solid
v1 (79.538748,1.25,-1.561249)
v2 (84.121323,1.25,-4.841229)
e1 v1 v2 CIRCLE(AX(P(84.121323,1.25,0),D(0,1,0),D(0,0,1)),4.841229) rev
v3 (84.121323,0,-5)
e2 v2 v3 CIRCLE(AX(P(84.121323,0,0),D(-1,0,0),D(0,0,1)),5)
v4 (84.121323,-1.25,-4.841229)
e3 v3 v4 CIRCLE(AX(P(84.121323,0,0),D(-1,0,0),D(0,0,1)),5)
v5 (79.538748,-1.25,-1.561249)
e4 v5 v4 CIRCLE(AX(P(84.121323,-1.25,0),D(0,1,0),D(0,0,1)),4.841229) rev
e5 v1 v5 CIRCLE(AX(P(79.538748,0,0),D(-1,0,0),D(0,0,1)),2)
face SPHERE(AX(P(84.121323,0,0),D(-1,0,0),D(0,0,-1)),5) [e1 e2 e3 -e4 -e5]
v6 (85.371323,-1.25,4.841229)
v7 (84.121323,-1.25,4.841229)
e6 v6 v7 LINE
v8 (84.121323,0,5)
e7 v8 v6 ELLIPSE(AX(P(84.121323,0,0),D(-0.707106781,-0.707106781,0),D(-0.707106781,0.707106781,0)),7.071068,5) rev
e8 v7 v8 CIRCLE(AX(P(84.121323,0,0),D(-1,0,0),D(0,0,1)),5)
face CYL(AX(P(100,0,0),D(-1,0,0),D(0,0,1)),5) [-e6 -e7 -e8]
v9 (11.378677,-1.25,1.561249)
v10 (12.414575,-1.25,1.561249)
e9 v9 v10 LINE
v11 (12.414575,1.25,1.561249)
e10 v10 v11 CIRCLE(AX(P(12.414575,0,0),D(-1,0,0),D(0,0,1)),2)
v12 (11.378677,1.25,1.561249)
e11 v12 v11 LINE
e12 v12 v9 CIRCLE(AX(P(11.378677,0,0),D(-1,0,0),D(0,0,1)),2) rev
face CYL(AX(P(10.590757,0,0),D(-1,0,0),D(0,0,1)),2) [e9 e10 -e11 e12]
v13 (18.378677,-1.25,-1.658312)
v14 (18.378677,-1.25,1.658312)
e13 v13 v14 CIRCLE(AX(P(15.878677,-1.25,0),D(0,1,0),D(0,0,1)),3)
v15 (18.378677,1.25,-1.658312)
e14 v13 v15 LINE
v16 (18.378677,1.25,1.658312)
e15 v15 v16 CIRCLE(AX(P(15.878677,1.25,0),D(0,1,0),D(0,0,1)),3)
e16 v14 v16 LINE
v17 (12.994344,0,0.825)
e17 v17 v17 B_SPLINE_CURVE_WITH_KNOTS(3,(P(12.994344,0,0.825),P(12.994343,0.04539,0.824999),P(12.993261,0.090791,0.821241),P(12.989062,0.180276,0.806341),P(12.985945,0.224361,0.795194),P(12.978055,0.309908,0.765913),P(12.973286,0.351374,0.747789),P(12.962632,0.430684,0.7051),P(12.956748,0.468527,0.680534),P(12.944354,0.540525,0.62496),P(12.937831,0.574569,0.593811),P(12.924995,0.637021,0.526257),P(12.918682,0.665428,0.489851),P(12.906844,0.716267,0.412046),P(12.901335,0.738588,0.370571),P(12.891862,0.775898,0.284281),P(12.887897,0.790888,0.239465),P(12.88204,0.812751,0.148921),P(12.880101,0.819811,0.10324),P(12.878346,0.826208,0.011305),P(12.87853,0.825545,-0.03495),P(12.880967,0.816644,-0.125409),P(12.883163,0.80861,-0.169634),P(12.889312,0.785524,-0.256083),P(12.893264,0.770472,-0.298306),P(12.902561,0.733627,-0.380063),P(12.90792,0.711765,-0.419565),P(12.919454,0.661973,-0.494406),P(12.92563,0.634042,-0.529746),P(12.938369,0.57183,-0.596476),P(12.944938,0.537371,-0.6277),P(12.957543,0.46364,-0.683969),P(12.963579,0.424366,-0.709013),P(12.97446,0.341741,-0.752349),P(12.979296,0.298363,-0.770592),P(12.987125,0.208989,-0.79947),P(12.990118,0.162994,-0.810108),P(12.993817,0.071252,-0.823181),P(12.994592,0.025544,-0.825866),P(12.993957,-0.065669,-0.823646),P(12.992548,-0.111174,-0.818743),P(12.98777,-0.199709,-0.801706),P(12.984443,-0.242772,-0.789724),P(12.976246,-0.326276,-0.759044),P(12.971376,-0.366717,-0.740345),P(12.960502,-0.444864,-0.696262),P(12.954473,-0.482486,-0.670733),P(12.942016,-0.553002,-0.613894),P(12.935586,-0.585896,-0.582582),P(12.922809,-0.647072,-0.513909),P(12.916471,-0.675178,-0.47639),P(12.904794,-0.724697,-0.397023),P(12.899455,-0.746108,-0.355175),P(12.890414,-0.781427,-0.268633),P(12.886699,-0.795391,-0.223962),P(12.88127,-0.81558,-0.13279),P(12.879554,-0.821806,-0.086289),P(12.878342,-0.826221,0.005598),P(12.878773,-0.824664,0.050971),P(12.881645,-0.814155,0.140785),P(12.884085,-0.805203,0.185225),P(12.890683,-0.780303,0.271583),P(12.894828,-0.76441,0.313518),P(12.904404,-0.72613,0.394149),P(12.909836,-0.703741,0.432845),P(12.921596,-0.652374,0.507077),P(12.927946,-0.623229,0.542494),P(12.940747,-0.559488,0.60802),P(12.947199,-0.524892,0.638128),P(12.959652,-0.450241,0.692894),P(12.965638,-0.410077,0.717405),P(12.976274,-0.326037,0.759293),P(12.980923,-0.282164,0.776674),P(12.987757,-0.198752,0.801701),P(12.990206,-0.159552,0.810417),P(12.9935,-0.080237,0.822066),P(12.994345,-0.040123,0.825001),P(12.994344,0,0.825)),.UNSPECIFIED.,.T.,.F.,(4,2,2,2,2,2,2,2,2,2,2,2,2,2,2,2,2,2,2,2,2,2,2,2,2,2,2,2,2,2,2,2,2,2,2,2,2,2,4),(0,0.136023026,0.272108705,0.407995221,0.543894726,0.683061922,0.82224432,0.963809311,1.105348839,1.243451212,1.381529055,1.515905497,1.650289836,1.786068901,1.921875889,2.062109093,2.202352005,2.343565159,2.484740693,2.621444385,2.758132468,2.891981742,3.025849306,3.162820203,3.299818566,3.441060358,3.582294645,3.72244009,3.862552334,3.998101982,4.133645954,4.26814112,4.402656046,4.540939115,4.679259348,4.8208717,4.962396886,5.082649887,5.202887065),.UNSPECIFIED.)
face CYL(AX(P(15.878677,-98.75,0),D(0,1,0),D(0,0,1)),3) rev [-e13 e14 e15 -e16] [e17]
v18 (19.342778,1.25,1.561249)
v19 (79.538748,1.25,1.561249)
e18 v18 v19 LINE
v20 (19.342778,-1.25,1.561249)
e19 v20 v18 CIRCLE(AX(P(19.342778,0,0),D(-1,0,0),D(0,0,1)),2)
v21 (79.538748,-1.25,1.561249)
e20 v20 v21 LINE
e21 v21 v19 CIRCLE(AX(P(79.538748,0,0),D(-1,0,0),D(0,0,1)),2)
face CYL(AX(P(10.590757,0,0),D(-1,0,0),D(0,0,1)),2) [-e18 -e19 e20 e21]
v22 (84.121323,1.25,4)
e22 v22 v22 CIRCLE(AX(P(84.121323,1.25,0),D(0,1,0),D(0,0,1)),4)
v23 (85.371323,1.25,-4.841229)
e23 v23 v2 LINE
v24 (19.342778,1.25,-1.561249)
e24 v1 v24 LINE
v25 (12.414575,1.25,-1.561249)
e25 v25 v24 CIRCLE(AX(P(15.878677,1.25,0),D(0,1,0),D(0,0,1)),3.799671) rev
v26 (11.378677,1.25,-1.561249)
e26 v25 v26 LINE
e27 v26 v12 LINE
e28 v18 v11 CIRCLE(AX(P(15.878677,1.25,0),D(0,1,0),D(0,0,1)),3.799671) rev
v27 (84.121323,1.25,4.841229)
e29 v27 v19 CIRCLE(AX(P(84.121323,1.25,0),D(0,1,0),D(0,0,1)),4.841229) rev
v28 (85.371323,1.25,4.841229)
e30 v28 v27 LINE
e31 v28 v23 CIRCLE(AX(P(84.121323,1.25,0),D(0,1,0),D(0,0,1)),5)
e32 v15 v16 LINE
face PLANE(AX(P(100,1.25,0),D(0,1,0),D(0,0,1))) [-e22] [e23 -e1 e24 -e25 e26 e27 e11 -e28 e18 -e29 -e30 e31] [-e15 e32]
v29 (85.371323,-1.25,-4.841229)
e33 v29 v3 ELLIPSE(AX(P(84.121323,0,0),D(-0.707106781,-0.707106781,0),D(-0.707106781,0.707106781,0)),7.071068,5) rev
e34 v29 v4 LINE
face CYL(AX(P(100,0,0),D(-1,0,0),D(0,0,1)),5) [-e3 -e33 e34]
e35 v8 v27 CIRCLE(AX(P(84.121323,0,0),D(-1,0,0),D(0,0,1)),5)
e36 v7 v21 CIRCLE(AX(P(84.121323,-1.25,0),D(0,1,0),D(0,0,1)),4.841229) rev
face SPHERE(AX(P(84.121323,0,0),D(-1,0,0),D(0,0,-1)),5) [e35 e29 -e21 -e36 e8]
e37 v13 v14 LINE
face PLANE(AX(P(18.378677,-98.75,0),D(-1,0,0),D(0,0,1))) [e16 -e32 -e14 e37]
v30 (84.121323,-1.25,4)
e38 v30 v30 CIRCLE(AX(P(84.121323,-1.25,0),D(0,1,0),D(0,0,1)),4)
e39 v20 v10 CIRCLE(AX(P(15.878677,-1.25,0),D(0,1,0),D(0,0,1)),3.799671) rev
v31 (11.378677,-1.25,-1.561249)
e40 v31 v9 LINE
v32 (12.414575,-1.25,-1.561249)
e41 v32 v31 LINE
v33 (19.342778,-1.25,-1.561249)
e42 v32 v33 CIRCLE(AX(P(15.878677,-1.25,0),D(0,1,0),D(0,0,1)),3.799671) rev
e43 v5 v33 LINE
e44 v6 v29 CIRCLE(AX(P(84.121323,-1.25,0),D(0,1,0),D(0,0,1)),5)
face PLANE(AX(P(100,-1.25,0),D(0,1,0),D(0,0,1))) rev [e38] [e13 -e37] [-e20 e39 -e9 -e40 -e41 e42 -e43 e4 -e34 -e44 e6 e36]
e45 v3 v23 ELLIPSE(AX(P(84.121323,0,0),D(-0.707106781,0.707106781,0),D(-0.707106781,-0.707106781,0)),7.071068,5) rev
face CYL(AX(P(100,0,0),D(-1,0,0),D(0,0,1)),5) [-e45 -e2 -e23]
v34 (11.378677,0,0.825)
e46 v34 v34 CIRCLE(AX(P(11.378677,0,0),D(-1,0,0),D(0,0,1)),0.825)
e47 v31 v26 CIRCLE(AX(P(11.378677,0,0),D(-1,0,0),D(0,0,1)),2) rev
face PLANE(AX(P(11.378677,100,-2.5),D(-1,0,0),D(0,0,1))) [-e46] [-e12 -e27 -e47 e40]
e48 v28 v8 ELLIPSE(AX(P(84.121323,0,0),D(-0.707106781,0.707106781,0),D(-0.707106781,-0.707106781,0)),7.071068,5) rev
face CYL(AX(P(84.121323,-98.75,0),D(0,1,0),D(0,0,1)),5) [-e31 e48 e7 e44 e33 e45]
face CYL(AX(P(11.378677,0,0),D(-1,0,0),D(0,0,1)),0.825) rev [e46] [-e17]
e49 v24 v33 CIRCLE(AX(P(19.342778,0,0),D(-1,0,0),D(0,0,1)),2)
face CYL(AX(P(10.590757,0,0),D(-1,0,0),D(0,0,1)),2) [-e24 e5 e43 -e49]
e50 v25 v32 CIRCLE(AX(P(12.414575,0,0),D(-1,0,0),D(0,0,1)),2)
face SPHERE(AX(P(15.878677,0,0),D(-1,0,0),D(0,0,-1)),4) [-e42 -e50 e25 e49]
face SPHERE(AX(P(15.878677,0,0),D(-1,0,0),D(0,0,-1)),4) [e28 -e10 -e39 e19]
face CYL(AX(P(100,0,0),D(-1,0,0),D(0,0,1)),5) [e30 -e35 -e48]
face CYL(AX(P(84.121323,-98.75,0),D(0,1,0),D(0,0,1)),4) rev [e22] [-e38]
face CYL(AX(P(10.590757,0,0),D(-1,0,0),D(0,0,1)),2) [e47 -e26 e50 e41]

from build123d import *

# Parameters (mm, degrees)
EXTRUDE_1_DEPTH          = 100
CUT_EXTRUDE_START        = -2.5
CUT_EXTRUDE_1_OUTLINE_W  = 107.411770938
CUT_EXTRUDE_1_OUTLINE_H  = 17.637554046
CUT_EXTRUDE_1_OUTLINE_R  = 4
CUT_EXTRUDE_1_DEPTH      = 2.5
CUT_EXTRUDE_2_DEPTH      = 100
CUT_EXTRUDE_2_DEPTH_BACK = 100
SKETCH_6_W               = 1
SKETCH_6_H               = 5
M2X0_35_1_D              = 1.65
M2X0_35_1_DEPTH          = 2
M2X0_35_1_TIP            = 0.495710011


# Read off the part's stored shape, not the designer's step: 切除-拉伸1
with BuildPart() as part:
    # 草图1 → 凸台-拉伸1 (new body)
    with BuildSketch(Plane(origin=(0, 0, 0), x_dir=(0, 0, -1), z_dir=(1, 0, 0))):
        with BuildLine():
            Line((4.841229183, 1.25), (0, 1.25))
            Line((0, 1.25), (0, -1.25))
            Line((0, -1.25), (4.841229183, -1.25))
            ThreePointArc((4.841229183, -1.25), (4.960148481, -0.630021462), (5, 0))
            ThreePointArc((5, 0), (4.960148481, 0.630021462), (4.841229183, 1.25))
        make_face()
        with BuildLine():
            Line((0, -1.25), (0, 1.25))
            Line((0, 1.25), (-4.841229183, 1.25))
            ThreePointArc((-4.841229183, 1.25), (-5, 0), (-4.841229183, -1.25))
            Line((-4.841229183, -1.25), (0, -1.25))
        make_face()
    extrude(amount=EXTRUDE_1_DEPTH)

    # 切除-拉伸1 outline → 切除-拉伸1 (cut)
    # profile 1 of 3: a face of its own
    with BuildSketch(Plane(origin=(0, 1.25, 0), x_dir=(1, 0, 0), z_dir=(0, 1, 0)).offset(CUT_EXTRUDE_START)):
        with Locations((50.551661955, -0.114939413)):
            Rectangle(CUT_EXTRUDE_1_OUTLINE_W, CUT_EXTRUDE_1_OUTLINE_H)
        with BuildLine():
            Line((15.8786768, 5), (84.1213232, 5))
            ThreePointArc((84.1213232, 5), (89.1213232, 0), (84.1213232, -5))
            Line((84.1213232, -5), (15.8786768, -5))
            ThreePointArc((15.8786768, -5), (10.8786768, 0), (15.8786768, 5))
        make_face(mode=Mode.SUBTRACT)
    # profile 2 of 3: a face of its own
    with BuildSketch(Plane(origin=(0, 1.25, 0), x_dir=(1, 0, 0), z_dir=(0, 1, 0)).offset(CUT_EXTRUDE_START)):
        with BuildLine():
            Line((18.3786768, -1.658312395), (18.3786768, 1.658312395))
            ThreePointArc((18.3786768, 1.658312395), (12.8786768, 0), (18.3786768, -1.658312395))
        make_face()
    # profile 3 of 3: a face of its own
    with BuildSketch(Plane(origin=(0, 1.25, 0), x_dir=(1, 0, 0), z_dir=(0, 1, 0)).offset(CUT_EXTRUDE_START)):
        with Locations((84.1213232, 0)):
            Circle(CUT_EXTRUDE_1_OUTLINE_R)
    extrude(amount=CUT_EXTRUDE_1_DEPTH, mode=Mode.SUBTRACT)

    # 草图3 → 切除-旋转2 (revolve, cut)
    with BuildSketch(Plane(origin=(0, 0, 0), x_dir=(1, 0, 0), z_dir=(0, 1, 0))):
        with BuildLine():
            Line((12.414575185, -2), (10.590757267, -2))
            Line((10.590757267, -2), (10.590757267, -5))
            Line((10.590757267, -5), (84.1213232, -5))
            ThreePointArc((84.1213232, -5), (81.382710412, -4.183300133), (79.538747505, -2))
            Line((79.538747505, -2), (19.342778415, -2))
            ThreePointArc((19.342778415, -2), (15.8786768, -4), (12.414575185, -2))
        make_face()
        with BuildLine():
            Line((10.590757267, 5), (10.590757267, 2))
            Line((10.590757267, 2), (12.414575185, 2))
            ThreePointArc((12.414575185, 2), (15.8786768, 4), (19.342778415, 2))
            Line((19.342778415, 2), (79.538747505, 2))
            ThreePointArc((79.538747505, 2), (81.382710412, 4.183300133), (84.1213232, 5))
            Line((84.1213232, 5), (10.590757267, 5))
        make_face()
    revolve(axis=Axis((10.590757267, 0, 0), (1, 0, 0)), mode=Mode.SUBTRACT)

    # 草图6 → 切除-拉伸2 (cut, two sides: drawn at the far end of the back side and taken through both)
    with BuildSketch(Plane(origin=(0, 0, 0), x_dir=(1, 0, 0), z_dir=(0, 1, 0)).offset(-CUT_EXTRUDE_2_DEPTH_BACK)):
        with Locations((10.8786768, 0)):
            Rectangle(SKETCH_6_W, SKETCH_6_H)
    extrude(amount=CUT_EXTRUDE_2_DEPTH + CUT_EXTRUDE_2_DEPTH_BACK, mode=Mode.SUBTRACT)

    # M2X0.35 螺纹孔的螺纹孔钻头1
    with Locations(Plane.ZY.offset(-11.3786768)):
        with Locations((0, 0)):
            Hole(M2X0_35_1_D / 2, depth=M2X0_35_1_DEPTH)
            with Locations((0, 0, -(M2X0_35_1_DEPTH + M2X0_35_1_TIP / 2))):  # 118° drill point
                Cone(0, M2X0_35_1_D / 2, M2X0_35_1_TIP, mode=Mode.SUBTRACT)


solid = part.part
